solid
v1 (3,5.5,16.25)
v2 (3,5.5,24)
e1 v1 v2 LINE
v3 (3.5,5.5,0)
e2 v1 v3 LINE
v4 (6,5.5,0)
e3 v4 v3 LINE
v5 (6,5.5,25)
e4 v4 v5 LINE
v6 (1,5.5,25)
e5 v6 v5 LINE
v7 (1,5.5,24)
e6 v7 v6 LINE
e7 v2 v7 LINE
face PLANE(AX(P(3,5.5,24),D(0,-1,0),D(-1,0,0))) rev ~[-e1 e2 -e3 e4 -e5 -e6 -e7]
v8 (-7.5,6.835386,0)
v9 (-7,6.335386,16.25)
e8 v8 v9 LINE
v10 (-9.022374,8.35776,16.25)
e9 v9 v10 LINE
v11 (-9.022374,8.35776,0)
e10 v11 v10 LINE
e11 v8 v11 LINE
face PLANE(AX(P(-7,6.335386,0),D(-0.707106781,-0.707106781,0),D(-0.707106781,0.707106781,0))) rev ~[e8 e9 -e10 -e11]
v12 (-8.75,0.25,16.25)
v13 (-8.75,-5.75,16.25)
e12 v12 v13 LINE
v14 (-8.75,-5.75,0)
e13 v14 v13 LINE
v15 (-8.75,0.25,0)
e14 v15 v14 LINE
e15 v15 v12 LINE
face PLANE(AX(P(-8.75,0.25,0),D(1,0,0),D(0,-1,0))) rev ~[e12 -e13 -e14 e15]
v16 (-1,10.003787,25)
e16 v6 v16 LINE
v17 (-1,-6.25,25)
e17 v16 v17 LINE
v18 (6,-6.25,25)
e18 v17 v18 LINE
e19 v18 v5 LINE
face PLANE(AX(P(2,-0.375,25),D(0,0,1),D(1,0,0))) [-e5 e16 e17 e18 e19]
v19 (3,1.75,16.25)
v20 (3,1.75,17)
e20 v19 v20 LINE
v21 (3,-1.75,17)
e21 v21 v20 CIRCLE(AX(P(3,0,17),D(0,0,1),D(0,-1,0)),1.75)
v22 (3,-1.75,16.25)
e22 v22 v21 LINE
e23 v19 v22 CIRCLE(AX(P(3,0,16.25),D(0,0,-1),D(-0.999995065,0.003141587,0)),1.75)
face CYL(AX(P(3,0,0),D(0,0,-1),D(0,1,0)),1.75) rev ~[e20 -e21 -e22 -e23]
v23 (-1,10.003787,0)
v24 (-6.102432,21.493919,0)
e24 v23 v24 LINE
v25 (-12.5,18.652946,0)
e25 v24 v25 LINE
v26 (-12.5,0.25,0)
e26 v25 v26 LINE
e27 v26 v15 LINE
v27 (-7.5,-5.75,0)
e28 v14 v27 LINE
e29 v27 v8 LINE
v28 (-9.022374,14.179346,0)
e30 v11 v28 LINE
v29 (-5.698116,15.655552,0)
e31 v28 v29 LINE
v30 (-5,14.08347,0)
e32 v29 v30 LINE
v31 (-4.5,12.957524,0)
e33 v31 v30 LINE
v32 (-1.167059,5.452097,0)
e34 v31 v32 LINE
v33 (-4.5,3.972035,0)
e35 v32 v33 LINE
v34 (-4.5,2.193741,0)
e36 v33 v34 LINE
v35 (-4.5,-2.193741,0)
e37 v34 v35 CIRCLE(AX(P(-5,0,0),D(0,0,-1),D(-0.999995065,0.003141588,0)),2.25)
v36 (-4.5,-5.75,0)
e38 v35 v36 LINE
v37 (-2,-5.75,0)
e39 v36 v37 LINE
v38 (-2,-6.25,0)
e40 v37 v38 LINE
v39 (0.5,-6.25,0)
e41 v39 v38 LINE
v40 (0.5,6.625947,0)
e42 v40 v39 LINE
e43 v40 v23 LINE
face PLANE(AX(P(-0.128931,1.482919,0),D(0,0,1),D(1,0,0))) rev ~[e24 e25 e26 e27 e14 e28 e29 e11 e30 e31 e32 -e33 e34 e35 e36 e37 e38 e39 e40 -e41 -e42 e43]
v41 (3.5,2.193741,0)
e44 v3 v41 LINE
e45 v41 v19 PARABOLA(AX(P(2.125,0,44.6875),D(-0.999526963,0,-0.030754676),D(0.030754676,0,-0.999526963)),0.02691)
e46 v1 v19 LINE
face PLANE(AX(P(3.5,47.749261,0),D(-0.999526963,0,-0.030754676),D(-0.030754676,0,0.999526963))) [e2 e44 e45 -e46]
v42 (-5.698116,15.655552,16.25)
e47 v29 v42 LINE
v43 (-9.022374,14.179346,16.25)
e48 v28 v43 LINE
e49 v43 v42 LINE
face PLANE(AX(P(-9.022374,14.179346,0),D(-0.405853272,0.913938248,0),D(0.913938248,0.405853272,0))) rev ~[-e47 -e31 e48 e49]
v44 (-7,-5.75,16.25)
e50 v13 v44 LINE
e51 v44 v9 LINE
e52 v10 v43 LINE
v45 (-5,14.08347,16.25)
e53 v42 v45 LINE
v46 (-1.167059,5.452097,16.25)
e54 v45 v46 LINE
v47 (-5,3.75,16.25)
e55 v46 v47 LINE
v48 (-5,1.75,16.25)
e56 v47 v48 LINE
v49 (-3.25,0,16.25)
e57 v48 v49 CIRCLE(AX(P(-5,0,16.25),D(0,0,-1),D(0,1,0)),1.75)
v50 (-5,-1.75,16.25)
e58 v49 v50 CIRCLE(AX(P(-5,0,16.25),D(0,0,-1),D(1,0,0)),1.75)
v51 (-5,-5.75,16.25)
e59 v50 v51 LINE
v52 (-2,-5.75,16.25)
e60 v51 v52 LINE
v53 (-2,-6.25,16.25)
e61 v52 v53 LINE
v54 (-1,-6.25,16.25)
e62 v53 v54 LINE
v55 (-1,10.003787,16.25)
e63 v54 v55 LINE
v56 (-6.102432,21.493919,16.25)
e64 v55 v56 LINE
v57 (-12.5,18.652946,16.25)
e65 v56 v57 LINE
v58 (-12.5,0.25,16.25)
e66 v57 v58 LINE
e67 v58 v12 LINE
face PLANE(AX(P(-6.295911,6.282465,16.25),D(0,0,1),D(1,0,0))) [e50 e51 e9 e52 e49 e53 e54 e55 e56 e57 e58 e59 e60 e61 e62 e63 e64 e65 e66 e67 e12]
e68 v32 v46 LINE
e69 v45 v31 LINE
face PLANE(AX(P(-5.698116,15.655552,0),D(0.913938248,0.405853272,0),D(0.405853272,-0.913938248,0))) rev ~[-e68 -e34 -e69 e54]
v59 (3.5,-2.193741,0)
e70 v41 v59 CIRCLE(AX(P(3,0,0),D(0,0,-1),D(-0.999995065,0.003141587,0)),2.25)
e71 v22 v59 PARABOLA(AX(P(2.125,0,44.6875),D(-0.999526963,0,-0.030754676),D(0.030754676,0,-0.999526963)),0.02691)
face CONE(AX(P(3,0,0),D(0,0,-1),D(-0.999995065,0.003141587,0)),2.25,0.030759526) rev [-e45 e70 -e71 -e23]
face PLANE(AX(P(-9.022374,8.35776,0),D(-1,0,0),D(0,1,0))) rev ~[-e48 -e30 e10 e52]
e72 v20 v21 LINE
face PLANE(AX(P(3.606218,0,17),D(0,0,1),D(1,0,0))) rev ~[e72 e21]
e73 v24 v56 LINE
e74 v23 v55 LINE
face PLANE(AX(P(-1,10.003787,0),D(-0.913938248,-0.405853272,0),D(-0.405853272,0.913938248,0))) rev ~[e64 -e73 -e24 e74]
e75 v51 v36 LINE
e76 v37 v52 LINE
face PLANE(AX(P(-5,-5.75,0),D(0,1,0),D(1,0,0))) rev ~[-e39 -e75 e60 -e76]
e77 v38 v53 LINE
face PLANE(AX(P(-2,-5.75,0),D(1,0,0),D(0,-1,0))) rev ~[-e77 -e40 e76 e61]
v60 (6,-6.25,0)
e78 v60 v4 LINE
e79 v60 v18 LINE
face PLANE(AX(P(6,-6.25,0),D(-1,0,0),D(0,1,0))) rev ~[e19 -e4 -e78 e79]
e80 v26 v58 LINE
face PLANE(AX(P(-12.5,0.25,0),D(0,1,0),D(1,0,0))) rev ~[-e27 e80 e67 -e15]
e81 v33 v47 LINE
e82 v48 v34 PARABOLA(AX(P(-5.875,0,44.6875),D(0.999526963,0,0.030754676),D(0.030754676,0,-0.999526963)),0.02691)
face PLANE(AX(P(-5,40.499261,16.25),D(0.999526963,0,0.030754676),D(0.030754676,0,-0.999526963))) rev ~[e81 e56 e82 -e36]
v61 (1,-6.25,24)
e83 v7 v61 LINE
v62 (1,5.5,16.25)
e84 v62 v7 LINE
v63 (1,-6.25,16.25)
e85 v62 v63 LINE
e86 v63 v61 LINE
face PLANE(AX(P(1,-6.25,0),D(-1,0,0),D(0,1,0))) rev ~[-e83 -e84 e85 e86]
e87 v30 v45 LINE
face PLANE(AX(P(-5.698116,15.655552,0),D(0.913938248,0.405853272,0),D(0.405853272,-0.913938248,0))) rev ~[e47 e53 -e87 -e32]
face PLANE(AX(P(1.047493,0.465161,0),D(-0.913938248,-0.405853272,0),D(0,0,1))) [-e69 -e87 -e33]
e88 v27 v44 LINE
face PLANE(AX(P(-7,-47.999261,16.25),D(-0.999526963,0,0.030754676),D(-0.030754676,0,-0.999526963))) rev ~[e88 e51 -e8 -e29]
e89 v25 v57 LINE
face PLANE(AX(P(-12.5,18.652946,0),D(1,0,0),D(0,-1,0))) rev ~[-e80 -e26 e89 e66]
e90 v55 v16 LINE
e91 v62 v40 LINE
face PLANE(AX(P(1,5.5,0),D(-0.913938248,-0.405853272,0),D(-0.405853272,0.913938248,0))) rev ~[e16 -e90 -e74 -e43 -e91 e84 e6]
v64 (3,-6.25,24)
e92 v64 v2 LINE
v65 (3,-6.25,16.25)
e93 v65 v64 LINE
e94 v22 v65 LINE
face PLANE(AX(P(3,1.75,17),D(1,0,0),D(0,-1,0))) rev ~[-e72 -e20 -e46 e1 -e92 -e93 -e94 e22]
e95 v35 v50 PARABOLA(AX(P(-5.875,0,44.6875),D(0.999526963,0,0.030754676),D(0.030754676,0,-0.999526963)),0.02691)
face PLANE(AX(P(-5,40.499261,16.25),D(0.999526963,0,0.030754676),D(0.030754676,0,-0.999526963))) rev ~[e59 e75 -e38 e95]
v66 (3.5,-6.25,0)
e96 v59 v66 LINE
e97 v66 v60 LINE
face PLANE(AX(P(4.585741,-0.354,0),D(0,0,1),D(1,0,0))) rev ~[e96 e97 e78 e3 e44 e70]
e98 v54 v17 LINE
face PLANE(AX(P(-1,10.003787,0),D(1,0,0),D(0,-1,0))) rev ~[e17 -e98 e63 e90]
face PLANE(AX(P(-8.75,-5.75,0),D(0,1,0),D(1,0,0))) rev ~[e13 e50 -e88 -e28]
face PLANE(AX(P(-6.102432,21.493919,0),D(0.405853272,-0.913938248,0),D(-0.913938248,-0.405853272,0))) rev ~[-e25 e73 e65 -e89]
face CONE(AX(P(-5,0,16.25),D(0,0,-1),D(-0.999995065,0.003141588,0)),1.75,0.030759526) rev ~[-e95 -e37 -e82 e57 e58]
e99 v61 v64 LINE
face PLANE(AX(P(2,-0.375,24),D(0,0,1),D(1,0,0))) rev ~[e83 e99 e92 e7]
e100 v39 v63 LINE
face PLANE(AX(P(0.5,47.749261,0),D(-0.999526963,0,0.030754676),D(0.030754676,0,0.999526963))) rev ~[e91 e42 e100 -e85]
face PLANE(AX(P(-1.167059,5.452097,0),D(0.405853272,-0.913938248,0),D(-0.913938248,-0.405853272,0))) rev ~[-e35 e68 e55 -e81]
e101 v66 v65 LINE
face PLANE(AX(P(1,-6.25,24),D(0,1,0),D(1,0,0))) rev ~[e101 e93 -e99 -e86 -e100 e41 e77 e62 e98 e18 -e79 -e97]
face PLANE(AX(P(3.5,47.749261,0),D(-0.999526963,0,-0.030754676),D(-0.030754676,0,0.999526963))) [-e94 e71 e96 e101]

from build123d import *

# Parameters (mm, degrees)
F1_DEPTH     = 16.25
F2_DEPTH     = 25
F3_START     = 24
F3_DEPTH     = 1
F4_START     = 17
F4_DEPTH     = 8
F5_T1_DEPTH  = 88.2485217467
F5_T3_DEPTH  = 96.2485217467
F5_T5_DEPTH  = 88.9985217467
F5_T10_DEPTH = 96.5839074706
F5_T15_DEPTH = 88.4985217467
F5_T20_DEPTH = 86.4985217467
F5_T23_ANGLE = 359.64
F5_T25_ANGLE = 359.64


# Not quite as in the source:
# - a fillet or chamfer that OpenCascade refuses, or shapes differently, is made with other operations: its cross-section is extruded or revolved along the edge and cut away or added


with BuildPart() as f1:
    # F0 (on Top) → F1 (new body)
    with BuildSketch(Plane.XY):
        with BuildLine():
            Line((-8.75, -5.75), (-7, -5.75))
            Line((-7, -5.75), (-7, 6.3353857239))
            Line((-7, 6.3353857239), (-9.0223743914, 8.3577601154))
            Line((-9.0223743914, 8.3577601154), (-9.0223743914, 14.1793463062))
            Line((-9.0223743914, 14.1793463062), (-5.6981157623, 15.6555524338))
            Line((-5.6981157623, 15.6555524338), (-1.1670593175, 5.4520969645))
            Line((-1.1670593175, 5.4520969645), (-5, 3.75))
            Line((-5, 3.75), (-5, 1.75))
            ThreePointArc((-5, 1.75), (-3.7625631329, 1.2374368671), (-3.25, 0))
            ThreePointArc((-3.25, 0), (-3.7625631329, -1.2374368671), (-5, -1.75))
            Line((-5, -1.75), (-5, -5.75))
            Line((-5, -5.75), (-2, -5.75))
            Line((-2, -5.75), (-2, -6.25))
            Line((-2, -6.25), (-1, -6.25))
            Line((-1, -6.25), (-1, 10.0037865203))
            Line((-1, 10.0037865203), (-6.1024322628, 21.4939193431))
            Line((-6.1024322628, 21.4939193431), (-12.5, 18.652946438))
            Line((-12.5, 18.652946438), (-12.5, 0.25))
            Line((-12.5, 0.25), (-8.75, 0.25))
            Line((-8.75, 0.25), (-8.75, -5.75))
        make_face()
    extrude(amount=F1_DEPTH)

    # F0 (on Top) → F2 (join)
    with BuildSketch(Plane.XY):
        Polygon((1, 5.5), (-1, 10.0037865203), (-1, -6.25), (1, -6.25), align=None)
    extrude(amount=F2_DEPTH)



with BuildPart() as f2:
    # F0 (on Top) → F2, piece 2 (new body)
    with BuildSketch(Plane.XY):
        with BuildLine():
            Line((6, 5.5), (3, 5.5))
            Line((3, 5.5), (3, 1.75))
            ThreePointArc((3, 1.75), (4.75, 0), (3, -1.75))
            Line((3, -1.75), (3, -6.25))
            Line((3, -6.25), (6, -6.25))
            Line((6, -6.25), (6, 5.5))
        make_face()
    extrude(amount=F2_DEPTH)


with BuildPart() as f1_1:
    add(f1.part)

    add(f2.part)  # F3 merges F2
    # F0 (on Top) → F3 (join)
    with BuildSketch(Plane.XY.offset(F3_START)):
        Polygon((3, 5.5), (1, 5.5), (1, -6.25), (3, -6.25), (3, -1.75), (3, 1.75), align=None)
    extrude(amount=F3_DEPTH)

    # F0 (on Top) → F4 (join)
    with BuildSketch(Plane.XY.offset(F4_START)):
        with BuildLine():
            ThreePointArc((3, -1.75), (4.75, 0), (3, 1.75))
            Line((3, 1.75), (3, -1.75))
        make_face()
    extrude(amount=F4_DEPTH)

    # F5: chamfer of 16.25 x 0.5 on 8 edges, made by hand

    # F5_s2 → F5_t1 (cut)
    with BuildSketch(Plane.XZ.offset(-47.7492608733)):
        Polygon((3.5, 0), (3, 16.25), (3, 0), align=None)
    extrude(amount=F5_T1_DEPTH, mode=Mode.SUBTRACT)

    # F5_s4 → F5_t3 (cut)
    with BuildSketch(Plane.XZ.offset(-47.7492608733)):
        Polygon((0.5, 0), (1, 16.25), (1, 0), align=None)
    extrude(amount=F5_T3_DEPTH, mode=Mode.SUBTRACT)

    # F5_s6 → F5_t5 (cut)
    with BuildSketch(Plane.XZ.offset(-40.4992608733)):
        Polygon((3.5, 0), (3, 16.25), (3, 0), align=None)
    extrude(amount=F5_T5_DEPTH, mode=Mode.SUBTRACT)


with BuildPart() as f5_tool8:
    # F5_s9 → F5_t10 (new body)
    with BuildSketch(Plane.XZ.offset(47.9992608733)):
        Polygon((-7, 16.25), (-7.5, 0), (-7, 0), align=None)
    extrude(amount=-F5_T10_DEPTH)

    split(bisect_by=Plane(origin=(-0.332307138, -0.332307138, 0), x_dir=(0, 0, 1), z_dir=(-0.7071067812, -0.7071067812, 0)), keep=Keep.TOP)


with BuildPart() as f1_2:
    add(f1_1.part)

    # F5_t7: cut F5_tool8
    add(f5_tool8.part, mode=Mode.SUBTRACT)


with BuildPart() as f5_tool13:
    # F5_s14 → F5_t15 (new body)
    with BuildSketch(Plane.XZ.offset(-40.4992608733)):
        Polygon((-5, 16.25), (-4.5, 0), (-5, 0), align=None)
    extrude(amount=F5_T15_DEPTH)

    split(bisect_by=Plane(origin=(1.0474931823, 0.4651611161, 0), x_dir=(0, 0, 1), z_dir=(-0.9139382482, -0.4058532722, 0)), keep=Keep.TOP)


with BuildPart() as f1_3:
    add(f1_2.part)

    # F5_t12: cut F5_tool13
    add(f5_tool13.part, mode=Mode.SUBTRACT)


with BuildPart() as f5_tool18:
    # F5_s19 → F5_t20 (new body)
    with BuildSketch(Plane.XZ.offset(-45.9992608733)):
        Polygon((-5, 16.25), (-4.5, 0), (-5, 0), align=None)
    extrude(amount=F5_T20_DEPTH)

    split(bisect_by=Plane(origin=(1.0474931823, 0.4651611161, 0), x_dir=(0, 0, 1), z_dir=(-0.9139382482, -0.4058532722, 0)), keep=Keep.TOP)


with BuildPart() as f1_4:
    add(f1_3.part)

    # F5_t17: cut F5_tool18
    add(f5_tool18.part, mode=Mode.SUBTRACT)

    # F5_s22 → F5_t23 (revolve, cut)
    with BuildSketch(Plane(origin=(-4.93479e-05, -0.0157078599, 0), x_dir=(0, 0, 1), z_dir=(-0.0031415875, -0.9999950652, 0))):
        Polygon((16.25, 6.749975326), (0, 7.249975326), (0, 6.749975326), align=None)
    revolve(axis=Axis((-5, 0, 0), (0, 0, -1)), revolution_arc=F5_T23_ANGLE, mode=Mode.SUBTRACT)

    # F5_s24 → F5_t25 (revolve, cut)
    with BuildSketch(Plane(origin=(2.96087e-05, 0.0094247159, 0), x_dir=(0, 0, 1), z_dir=(-0.0031415875, -0.9999950652, 0))):
        Polygon((0, -0.7499851956), (16.25, -1.2499851956), (0, -1.2499851956), align=None)
    revolve(axis=Axis((3, 0, 0), (0, 0, -1)), revolution_arc=F5_T25_ANGLE, mode=Mode.SUBTRACT)


solid = f1_4.part
